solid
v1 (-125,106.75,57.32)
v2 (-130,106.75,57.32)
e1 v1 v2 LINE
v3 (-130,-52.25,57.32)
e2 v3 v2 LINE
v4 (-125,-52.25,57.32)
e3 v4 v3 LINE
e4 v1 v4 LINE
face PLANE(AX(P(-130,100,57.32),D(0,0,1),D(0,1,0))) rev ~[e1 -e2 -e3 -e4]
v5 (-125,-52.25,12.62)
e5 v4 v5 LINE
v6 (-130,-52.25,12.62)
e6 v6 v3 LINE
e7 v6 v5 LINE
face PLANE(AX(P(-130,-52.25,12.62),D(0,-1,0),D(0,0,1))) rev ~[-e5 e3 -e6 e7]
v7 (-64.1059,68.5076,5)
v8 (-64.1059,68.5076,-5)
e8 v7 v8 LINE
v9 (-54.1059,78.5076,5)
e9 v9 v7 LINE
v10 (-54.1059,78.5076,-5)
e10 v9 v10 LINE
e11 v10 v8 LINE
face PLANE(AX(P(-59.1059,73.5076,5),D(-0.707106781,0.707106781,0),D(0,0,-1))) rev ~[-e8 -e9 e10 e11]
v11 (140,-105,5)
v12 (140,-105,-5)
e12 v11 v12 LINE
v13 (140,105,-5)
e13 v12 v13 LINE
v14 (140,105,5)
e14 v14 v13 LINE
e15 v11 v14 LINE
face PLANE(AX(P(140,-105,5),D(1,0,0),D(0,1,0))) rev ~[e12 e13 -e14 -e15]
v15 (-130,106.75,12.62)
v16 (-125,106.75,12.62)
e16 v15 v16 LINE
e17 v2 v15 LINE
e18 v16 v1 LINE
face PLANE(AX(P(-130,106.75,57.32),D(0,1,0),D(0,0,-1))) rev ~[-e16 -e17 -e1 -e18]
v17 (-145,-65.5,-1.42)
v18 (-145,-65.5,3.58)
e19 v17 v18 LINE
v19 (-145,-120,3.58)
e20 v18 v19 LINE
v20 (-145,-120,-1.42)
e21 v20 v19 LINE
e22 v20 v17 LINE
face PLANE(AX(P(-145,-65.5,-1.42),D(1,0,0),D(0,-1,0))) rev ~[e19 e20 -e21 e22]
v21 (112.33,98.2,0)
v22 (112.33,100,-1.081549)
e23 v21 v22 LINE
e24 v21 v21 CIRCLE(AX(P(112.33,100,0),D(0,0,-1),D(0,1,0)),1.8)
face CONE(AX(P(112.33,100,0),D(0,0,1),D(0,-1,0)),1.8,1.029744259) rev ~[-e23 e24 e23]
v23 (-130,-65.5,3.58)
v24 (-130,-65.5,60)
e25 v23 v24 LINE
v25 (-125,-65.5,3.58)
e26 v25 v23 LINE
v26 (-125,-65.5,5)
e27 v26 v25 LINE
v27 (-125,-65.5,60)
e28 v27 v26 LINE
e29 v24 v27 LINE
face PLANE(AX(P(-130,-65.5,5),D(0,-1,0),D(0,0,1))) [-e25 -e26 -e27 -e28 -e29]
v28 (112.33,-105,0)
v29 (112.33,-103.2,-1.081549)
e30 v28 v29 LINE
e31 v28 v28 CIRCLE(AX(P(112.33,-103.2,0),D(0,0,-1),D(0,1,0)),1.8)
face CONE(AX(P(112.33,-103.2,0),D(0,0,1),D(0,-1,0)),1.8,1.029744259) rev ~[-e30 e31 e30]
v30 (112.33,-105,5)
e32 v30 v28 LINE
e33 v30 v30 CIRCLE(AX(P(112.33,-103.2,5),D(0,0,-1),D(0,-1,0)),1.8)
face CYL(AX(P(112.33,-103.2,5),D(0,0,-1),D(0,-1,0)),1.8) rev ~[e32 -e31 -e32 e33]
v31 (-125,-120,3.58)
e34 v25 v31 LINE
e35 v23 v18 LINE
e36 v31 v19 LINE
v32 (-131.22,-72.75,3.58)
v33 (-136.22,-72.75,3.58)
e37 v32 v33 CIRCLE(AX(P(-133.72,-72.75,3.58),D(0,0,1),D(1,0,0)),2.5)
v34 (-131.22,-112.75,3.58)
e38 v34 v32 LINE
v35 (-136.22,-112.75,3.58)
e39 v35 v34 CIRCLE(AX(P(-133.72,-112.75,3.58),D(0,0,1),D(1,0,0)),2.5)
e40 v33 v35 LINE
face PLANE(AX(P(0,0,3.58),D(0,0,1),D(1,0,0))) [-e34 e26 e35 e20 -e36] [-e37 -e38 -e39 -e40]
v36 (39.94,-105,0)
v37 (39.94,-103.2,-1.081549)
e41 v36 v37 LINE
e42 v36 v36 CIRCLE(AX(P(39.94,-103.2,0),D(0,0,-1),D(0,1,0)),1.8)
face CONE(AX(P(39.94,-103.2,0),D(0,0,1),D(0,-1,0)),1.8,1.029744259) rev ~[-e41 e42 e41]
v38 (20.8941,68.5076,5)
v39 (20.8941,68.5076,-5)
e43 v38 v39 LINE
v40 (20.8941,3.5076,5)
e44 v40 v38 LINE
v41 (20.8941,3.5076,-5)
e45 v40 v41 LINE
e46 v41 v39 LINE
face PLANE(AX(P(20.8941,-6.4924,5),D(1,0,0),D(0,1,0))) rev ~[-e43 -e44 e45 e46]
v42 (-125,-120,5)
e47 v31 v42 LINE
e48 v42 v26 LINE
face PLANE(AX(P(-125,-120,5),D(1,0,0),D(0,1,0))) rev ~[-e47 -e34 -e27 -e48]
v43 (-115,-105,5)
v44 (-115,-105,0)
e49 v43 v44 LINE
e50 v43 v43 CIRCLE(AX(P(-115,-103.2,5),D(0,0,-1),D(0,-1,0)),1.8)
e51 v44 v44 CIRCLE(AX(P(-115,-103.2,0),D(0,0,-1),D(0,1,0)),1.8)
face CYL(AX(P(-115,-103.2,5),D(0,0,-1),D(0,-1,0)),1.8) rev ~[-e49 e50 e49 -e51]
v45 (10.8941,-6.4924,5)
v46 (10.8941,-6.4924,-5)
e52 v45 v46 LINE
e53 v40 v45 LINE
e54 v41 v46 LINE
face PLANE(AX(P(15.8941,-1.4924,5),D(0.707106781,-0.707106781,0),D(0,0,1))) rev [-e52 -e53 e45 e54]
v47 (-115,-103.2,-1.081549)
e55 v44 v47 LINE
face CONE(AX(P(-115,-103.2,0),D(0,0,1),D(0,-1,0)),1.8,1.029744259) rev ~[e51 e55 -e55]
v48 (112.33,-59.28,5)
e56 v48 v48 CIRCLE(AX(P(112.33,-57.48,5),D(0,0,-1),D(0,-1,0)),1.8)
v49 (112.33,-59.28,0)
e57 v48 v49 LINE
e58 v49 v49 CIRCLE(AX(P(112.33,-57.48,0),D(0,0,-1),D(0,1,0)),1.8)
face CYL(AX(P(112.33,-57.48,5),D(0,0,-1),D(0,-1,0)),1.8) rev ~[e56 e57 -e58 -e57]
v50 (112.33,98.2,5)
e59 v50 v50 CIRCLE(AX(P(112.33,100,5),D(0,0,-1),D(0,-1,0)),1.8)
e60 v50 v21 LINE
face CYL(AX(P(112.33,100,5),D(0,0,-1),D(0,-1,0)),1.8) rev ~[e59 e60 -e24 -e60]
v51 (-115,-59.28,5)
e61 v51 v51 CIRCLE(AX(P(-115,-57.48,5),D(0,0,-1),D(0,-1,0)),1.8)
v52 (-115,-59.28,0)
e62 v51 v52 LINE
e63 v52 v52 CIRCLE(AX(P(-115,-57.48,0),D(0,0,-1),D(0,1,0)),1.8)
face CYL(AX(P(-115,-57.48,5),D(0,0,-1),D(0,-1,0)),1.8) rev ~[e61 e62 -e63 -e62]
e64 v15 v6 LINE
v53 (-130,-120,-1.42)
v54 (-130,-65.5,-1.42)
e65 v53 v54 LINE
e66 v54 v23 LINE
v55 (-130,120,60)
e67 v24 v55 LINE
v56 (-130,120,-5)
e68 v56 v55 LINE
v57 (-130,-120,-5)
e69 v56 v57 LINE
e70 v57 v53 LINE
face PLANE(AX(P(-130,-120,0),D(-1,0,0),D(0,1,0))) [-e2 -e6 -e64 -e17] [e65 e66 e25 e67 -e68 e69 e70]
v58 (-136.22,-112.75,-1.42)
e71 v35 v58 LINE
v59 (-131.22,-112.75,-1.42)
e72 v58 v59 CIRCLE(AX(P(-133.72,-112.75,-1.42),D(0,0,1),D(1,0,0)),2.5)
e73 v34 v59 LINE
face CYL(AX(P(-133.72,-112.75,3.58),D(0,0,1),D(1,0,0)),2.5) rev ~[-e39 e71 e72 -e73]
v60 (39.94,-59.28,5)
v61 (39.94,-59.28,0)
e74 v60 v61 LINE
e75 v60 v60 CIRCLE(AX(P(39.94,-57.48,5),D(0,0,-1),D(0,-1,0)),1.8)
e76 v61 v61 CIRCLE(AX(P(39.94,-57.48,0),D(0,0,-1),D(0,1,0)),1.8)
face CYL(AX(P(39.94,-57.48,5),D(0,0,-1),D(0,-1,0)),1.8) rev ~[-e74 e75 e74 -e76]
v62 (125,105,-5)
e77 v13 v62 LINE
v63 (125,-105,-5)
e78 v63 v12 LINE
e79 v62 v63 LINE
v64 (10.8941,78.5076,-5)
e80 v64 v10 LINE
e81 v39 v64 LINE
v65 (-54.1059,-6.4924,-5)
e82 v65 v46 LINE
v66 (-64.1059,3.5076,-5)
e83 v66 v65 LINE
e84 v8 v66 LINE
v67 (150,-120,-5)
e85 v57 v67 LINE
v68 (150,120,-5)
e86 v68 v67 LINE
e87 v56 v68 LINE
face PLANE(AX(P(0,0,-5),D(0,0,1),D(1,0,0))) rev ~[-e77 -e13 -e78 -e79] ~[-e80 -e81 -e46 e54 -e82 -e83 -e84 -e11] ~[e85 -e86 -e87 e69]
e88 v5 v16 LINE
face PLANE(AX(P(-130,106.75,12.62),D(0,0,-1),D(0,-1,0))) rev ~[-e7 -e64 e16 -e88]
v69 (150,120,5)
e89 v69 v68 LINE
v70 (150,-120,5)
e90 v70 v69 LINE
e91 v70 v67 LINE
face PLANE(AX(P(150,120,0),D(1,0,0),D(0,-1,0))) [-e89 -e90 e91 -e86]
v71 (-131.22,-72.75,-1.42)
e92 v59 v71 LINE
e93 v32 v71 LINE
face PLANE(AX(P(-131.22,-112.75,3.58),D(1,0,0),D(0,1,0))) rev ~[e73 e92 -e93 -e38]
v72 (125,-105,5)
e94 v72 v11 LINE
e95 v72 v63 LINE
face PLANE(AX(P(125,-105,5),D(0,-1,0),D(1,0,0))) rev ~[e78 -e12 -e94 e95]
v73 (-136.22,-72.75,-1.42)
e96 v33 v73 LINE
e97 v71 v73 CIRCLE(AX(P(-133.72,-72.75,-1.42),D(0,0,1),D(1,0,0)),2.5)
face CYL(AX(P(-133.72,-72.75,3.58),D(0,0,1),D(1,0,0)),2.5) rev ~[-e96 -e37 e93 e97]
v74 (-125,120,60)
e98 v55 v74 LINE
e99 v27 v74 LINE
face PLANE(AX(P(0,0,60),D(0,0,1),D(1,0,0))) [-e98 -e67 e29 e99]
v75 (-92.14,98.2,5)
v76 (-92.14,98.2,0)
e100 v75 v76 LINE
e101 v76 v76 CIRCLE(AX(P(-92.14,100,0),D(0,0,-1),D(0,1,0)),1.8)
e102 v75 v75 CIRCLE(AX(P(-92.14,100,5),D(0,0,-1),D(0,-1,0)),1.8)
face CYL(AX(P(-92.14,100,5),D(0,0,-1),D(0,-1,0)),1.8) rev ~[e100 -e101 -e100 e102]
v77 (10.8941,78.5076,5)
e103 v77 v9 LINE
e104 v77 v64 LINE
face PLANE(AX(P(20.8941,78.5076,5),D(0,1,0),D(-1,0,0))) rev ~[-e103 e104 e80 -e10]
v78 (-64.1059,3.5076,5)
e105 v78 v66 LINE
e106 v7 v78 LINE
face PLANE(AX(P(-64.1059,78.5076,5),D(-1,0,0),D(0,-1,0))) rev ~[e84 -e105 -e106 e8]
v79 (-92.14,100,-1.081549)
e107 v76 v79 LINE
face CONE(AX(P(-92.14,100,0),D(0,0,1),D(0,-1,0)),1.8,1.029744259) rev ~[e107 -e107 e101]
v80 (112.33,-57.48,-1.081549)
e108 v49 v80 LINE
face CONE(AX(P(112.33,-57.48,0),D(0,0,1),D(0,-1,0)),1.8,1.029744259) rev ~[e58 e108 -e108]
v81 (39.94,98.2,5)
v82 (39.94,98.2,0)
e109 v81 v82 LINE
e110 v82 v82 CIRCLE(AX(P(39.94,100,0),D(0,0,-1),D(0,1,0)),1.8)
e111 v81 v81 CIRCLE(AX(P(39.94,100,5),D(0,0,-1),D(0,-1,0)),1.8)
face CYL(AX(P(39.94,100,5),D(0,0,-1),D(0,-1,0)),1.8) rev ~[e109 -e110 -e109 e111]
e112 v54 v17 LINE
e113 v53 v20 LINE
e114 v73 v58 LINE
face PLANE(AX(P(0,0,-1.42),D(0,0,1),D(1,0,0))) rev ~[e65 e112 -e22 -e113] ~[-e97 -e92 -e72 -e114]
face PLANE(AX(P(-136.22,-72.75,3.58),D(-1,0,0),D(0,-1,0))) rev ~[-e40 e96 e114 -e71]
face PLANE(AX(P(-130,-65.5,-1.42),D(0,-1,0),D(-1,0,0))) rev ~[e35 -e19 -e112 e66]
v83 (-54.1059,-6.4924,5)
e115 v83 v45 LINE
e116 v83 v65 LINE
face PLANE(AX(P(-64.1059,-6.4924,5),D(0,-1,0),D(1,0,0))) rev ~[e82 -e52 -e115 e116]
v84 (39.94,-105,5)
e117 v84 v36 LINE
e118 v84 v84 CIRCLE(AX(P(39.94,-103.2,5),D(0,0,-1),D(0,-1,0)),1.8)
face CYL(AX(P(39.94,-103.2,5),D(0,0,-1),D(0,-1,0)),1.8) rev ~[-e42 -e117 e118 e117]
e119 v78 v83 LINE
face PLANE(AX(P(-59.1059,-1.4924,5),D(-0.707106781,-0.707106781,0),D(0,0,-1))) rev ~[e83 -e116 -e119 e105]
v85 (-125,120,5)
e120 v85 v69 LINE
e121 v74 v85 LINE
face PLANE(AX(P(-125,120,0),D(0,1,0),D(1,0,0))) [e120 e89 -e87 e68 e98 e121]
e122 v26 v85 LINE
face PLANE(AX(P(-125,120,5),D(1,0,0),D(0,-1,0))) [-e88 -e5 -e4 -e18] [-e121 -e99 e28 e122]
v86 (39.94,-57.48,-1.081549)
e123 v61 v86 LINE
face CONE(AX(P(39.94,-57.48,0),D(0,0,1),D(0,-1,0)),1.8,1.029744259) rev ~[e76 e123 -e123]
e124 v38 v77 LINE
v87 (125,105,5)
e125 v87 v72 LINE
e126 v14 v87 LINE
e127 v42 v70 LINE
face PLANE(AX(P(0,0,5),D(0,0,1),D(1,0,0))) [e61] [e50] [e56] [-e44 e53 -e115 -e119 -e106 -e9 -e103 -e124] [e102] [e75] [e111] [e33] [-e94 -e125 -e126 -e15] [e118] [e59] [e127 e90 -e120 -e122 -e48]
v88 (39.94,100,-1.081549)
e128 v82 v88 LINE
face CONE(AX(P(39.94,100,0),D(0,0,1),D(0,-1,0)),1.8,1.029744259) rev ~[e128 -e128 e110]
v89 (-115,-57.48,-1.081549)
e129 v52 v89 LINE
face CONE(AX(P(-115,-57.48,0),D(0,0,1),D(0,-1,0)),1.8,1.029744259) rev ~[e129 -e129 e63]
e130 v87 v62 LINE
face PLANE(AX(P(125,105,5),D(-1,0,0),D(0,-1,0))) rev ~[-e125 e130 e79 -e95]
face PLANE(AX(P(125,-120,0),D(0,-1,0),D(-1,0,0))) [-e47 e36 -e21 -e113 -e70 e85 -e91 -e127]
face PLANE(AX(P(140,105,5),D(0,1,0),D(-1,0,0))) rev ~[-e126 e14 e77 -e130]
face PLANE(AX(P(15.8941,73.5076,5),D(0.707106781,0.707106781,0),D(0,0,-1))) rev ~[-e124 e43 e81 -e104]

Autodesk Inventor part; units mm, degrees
ref_plane "YZ Plane" through (0, 0, 0) normal (1, 0, 0) x (0, 1, 0)
ref_plane "XZ Plane" through (0, 0, 0) normal (0, 1, 0) x (-1, 0, 0)
ref_plane "XY Plane" through (0, 0, 0) normal (0, 0, 1) x (1, 0, 0)
sketch "Sketch1" plane through (0, 0, 0) normal (0, 0, 1) x (1, 0, 0)
  line L0 (-125, 120) -> (125, 120)
  line L1 (125, 120) -> (125, -120)
  line L2 (125, -120) -> (-125, -120)
  line L3 (-125, -120) -> (-125, 120)
  point P0 (0, 0)
  dimension "d0" = 250
  dimension "d1" = 240
  dimension "d2" = 125
  dimension "d3" = 120
extrude "Extrusion1" add sketch "Sketch1" along normal mid plane 10
sketch "Sketch5" plane through (0, 0, 5) normal (0, 0, 1) x (1, 0, 0)
  line L0 (-115, 100) -> (-115, -103.2)
  line L1 (-92.14, 100) -> (-92.14, -103.2)
  line L2 (39.94, 100) -> (39.94, -103.2)
  line L3 (112.33, 100) -> (112.33, -103.2)
  line L4 (-92.14, 100) -> (112.33, 100)
  line L5 (-115, -57.48) -> (39.94, -57.48)
  line L6 (112.33, -57.48) -> (39.94, -57.48)
  line L7 (-115, -103.2) -> (39.94, -103.2)
  line L8 (112.33, -103.2) -> (39.94, -103.2)
  line L9 (-115, 100) -> (-92.14, 100)
  line L10 (-125, 120) -> (-125, -120) projected
  line L11 (125, 120) -> (-125, 120) projected
  point P0 (0, 0)
  dimension "d25" = 10
  dimension "d26" = 22.86
  dimension "d27" = 72.39
  dimension "d28" = 132.08
  dimension "d29" = 45.72
  dimension "d30" = 157.48
  dimension "d38" = 20
hole "Hole2" at (-92.14, 100, 5) at (39.94, 100, 5) at (112.33, 100, 5) at (112.33, -57.48, 5) at (39.94, -57.48, 5) at (39.94, -103.2, 5) at (112.33, -103.2, 5) at (-115, -57.48, 5) at (-115, -103.2, 5) direction (0, 0, -1) diameter 3.6 depth 5 tip angle 118
thicken "Thicken1" operation add thickness 5 both sides no extend neighbours yes toward (-1, 0, 0) faces at (-125, 40, -1.6667)
sketch "Sketch11" plane through (0, 0, 5) normal (0, 0, 1) x (1, 0, 0)
  line L0 (125, 120) -> (-130, 120) projected
  line L1 (-130, -120) -> (125, -120) projected
  line L2 (-130, 120) -> (-125, 120)
  line L3 (-125, 120) -> (-125, -120)
  line L4 (-125, -120) -> (-130, -120)
  line L5 (-130, -120) -> (-130, 120)
  point P0 (0, 0)
  dimension "d70" = 5
extrude "Extrusion5" add sketch "Sketch11" along normal blind 55
sketch "Sketch12" plane through (-130, -120, -5) normal (-1, 0, 0) x (0, 0, 1)
  line L0 (10, 221.8) -> (10, 218.2) projected
  line L1 (10, 220) -> (65, 220)
  line L2 (65, 240) -> (65, 0) projected
  line L3 (62.32, 226.75) -> (17.62, 226.75)
  line L4 (17.62, 226.75) -> (17.62, 67.75)
  line L5 (17.62, 67.75) -> (62.32, 67.75)
  line L6 (62.32, 67.75) -> (62.32, 226.75)
  line L7 (10, 240) -> (10, 0) projected
  line L8 (10, 0) -> (10, 240) projected
  line L9 (65, 0) -> (65, 240) projected
  line L10 (10, 54.5) -> (65, 54.5)
  line L11 (65, 54.5) -> (65, 0)
  line L12 (65, 0) -> (10, 0)
  line L13 (10, 0) -> (10, 54.5)
  point P0 (10, 0)
  point P1 (65, 54.5)
  point P2 (10, 54.5)
  dimension "d75" = 44.7
  dimension "d76" = 159
  dimension "d77" = 6.75
  dimension "d78" = 7.62
  dimension "d79" = 13.25
extrude "Extrusion6" cut sketch "Sketch12" against normal up to surface (5 mm away) contours L4 L3 L6 L1 | L1 L6 L5 L4 | L10 L2 L12 L7
ref_plane "Work Plane1" through (0, 0, -1.42) normal (0, 0, 1) x (1, 0, 0)
sketch "Sketch13" plane through (0, 0, -1.42) normal (0, 0, 1) x (1, 0, 0)
  line L0 (-130, -120) -> (-130, -65.5) projected
  line L1 (-130, -65.5) -> (-145, -65.5)
  line L2 (-145, -65.5) -> (-145, -120)
  line L3 (-145, -120) -> (-130, -120)
  line L4 (-130, -120) -> (-130, -65.5)
  point P0 (0, 0)
  dimension "d83" = 15
  dimension "d86" = 54.5
extrude "Extrusion7" add sketch "Sketch13" along normal blind 5
sketch "Sketch14" plane through (0, 0, 3.58) normal (0, 0, 1) x (1, 0, 0)
  line L0 (-145, -120) -> (-130, -120) projected
  line L1 (-131.22, -72.75) -> (-136.22, -72.75)
  line L2 (-136.22, -72.75) -> (-136.22, -112.75)
  line L3 (-136.22, -112.75) -> (-131.22, -112.75)
  line L4 (-131.22, -112.75) -> (-131.22, -72.75)
  line L5 (-130, -120) -> (-130, -65.5) projected
  line L6 (-125, 120) -> (-125, -65.5) projected
  circle A0 centre (-133.72, -72.75) radius 2.5
  circle A1 centre (-133.72, -112.75) radius 2.5
  point P0 (0, 0)
  point P1 (-137.2605, -92.75)
  dimension "d87" = 27.25
  dimension "d88" = 5
  dimension "d89" = 40
  dimension "d90" = 20
  dimension "d92" = 6.22
extrude "Extrusion8" cut sketch "Sketch14" against normal up to surface (5 mm away)
sketch "Sketch15" plane through (0, 0, 5) normal (0, 0, 1) x (1, 0, 0)
  line L0 (-125, 120) -> (-125, -65.5) projected
  line L1 (-145, -120) -> (-130, -120) projected
  line L2 (-125, -65.5) -> (-130, -65.5)
  line L3 (-130, -65.5) -> (-130, -120)
  line L4 (-130, -120) -> (-125, -120)
  line L5 (-125, -120) -> (-125, -65.5)
  point P0 (0, 0)
extrude "Extrusion9" cut sketch "Sketch15" against normal blind 1.42
thicken "Thicken2" operation add thickness 25 both sides no extend neighbours yes toward (1, 0, 0) faces at (125, -40, -1.6667)
sketch "Sketch18" plane through (0, 0, 5) normal (0, 0, 1) x (1, 0, 0)
  line L0 (150, 120) -> (-125, 120) projected
  line L1 (140, 105) -> (125, 105)
  line L2 (125, 105) -> (125, -105)
  line L3 (125, -105) -> (140, -105)
  line L4 (140, -105) -> (140, 105)
  line L5 (150, -120) -> (150, 120) projected
  line L6 (20.8941, 78.5076) -> (-64.1059, 78.5076)
  line L7 (-64.1059, 78.5076) -> (-64.1059, -6.4924)
  line L8 (-64.1059, -6.4924) -> (20.8941, -6.4924)
  line L9 (20.8941, -6.4924) -> (20.8941, 78.5076)
  point P0 (0, 0)
  point P1 (139.9053, 0)
  dimension "d102" = 120
  dimension "d103" = 15
  dimension "d104" = 210
  dimension "d105" = 105
  dimension "d106" = 10
  dimension "d107" = 85
  dimension "d108" = 85
extrude "Extrusion11" cut sketch "Sketch18" against normal up to surface (10 mm away)
chamfer "Chamfer4" distance 10 angle 45 4 edges at (-64.1059, 78.5076, 0) (-64.1059, -6.4924, 0) (20.8941, -6.4924, 0) (20.8941, 78.5076, 0)
equation "\"d2\" = 0.5 * d0"
equation "\"d3\" = 0.5 * d1"
equation "\"d87\" = 0.5 * d86"
equation "\"d90\" = 0.5 * d89"
properties part number "_3DPrint"
